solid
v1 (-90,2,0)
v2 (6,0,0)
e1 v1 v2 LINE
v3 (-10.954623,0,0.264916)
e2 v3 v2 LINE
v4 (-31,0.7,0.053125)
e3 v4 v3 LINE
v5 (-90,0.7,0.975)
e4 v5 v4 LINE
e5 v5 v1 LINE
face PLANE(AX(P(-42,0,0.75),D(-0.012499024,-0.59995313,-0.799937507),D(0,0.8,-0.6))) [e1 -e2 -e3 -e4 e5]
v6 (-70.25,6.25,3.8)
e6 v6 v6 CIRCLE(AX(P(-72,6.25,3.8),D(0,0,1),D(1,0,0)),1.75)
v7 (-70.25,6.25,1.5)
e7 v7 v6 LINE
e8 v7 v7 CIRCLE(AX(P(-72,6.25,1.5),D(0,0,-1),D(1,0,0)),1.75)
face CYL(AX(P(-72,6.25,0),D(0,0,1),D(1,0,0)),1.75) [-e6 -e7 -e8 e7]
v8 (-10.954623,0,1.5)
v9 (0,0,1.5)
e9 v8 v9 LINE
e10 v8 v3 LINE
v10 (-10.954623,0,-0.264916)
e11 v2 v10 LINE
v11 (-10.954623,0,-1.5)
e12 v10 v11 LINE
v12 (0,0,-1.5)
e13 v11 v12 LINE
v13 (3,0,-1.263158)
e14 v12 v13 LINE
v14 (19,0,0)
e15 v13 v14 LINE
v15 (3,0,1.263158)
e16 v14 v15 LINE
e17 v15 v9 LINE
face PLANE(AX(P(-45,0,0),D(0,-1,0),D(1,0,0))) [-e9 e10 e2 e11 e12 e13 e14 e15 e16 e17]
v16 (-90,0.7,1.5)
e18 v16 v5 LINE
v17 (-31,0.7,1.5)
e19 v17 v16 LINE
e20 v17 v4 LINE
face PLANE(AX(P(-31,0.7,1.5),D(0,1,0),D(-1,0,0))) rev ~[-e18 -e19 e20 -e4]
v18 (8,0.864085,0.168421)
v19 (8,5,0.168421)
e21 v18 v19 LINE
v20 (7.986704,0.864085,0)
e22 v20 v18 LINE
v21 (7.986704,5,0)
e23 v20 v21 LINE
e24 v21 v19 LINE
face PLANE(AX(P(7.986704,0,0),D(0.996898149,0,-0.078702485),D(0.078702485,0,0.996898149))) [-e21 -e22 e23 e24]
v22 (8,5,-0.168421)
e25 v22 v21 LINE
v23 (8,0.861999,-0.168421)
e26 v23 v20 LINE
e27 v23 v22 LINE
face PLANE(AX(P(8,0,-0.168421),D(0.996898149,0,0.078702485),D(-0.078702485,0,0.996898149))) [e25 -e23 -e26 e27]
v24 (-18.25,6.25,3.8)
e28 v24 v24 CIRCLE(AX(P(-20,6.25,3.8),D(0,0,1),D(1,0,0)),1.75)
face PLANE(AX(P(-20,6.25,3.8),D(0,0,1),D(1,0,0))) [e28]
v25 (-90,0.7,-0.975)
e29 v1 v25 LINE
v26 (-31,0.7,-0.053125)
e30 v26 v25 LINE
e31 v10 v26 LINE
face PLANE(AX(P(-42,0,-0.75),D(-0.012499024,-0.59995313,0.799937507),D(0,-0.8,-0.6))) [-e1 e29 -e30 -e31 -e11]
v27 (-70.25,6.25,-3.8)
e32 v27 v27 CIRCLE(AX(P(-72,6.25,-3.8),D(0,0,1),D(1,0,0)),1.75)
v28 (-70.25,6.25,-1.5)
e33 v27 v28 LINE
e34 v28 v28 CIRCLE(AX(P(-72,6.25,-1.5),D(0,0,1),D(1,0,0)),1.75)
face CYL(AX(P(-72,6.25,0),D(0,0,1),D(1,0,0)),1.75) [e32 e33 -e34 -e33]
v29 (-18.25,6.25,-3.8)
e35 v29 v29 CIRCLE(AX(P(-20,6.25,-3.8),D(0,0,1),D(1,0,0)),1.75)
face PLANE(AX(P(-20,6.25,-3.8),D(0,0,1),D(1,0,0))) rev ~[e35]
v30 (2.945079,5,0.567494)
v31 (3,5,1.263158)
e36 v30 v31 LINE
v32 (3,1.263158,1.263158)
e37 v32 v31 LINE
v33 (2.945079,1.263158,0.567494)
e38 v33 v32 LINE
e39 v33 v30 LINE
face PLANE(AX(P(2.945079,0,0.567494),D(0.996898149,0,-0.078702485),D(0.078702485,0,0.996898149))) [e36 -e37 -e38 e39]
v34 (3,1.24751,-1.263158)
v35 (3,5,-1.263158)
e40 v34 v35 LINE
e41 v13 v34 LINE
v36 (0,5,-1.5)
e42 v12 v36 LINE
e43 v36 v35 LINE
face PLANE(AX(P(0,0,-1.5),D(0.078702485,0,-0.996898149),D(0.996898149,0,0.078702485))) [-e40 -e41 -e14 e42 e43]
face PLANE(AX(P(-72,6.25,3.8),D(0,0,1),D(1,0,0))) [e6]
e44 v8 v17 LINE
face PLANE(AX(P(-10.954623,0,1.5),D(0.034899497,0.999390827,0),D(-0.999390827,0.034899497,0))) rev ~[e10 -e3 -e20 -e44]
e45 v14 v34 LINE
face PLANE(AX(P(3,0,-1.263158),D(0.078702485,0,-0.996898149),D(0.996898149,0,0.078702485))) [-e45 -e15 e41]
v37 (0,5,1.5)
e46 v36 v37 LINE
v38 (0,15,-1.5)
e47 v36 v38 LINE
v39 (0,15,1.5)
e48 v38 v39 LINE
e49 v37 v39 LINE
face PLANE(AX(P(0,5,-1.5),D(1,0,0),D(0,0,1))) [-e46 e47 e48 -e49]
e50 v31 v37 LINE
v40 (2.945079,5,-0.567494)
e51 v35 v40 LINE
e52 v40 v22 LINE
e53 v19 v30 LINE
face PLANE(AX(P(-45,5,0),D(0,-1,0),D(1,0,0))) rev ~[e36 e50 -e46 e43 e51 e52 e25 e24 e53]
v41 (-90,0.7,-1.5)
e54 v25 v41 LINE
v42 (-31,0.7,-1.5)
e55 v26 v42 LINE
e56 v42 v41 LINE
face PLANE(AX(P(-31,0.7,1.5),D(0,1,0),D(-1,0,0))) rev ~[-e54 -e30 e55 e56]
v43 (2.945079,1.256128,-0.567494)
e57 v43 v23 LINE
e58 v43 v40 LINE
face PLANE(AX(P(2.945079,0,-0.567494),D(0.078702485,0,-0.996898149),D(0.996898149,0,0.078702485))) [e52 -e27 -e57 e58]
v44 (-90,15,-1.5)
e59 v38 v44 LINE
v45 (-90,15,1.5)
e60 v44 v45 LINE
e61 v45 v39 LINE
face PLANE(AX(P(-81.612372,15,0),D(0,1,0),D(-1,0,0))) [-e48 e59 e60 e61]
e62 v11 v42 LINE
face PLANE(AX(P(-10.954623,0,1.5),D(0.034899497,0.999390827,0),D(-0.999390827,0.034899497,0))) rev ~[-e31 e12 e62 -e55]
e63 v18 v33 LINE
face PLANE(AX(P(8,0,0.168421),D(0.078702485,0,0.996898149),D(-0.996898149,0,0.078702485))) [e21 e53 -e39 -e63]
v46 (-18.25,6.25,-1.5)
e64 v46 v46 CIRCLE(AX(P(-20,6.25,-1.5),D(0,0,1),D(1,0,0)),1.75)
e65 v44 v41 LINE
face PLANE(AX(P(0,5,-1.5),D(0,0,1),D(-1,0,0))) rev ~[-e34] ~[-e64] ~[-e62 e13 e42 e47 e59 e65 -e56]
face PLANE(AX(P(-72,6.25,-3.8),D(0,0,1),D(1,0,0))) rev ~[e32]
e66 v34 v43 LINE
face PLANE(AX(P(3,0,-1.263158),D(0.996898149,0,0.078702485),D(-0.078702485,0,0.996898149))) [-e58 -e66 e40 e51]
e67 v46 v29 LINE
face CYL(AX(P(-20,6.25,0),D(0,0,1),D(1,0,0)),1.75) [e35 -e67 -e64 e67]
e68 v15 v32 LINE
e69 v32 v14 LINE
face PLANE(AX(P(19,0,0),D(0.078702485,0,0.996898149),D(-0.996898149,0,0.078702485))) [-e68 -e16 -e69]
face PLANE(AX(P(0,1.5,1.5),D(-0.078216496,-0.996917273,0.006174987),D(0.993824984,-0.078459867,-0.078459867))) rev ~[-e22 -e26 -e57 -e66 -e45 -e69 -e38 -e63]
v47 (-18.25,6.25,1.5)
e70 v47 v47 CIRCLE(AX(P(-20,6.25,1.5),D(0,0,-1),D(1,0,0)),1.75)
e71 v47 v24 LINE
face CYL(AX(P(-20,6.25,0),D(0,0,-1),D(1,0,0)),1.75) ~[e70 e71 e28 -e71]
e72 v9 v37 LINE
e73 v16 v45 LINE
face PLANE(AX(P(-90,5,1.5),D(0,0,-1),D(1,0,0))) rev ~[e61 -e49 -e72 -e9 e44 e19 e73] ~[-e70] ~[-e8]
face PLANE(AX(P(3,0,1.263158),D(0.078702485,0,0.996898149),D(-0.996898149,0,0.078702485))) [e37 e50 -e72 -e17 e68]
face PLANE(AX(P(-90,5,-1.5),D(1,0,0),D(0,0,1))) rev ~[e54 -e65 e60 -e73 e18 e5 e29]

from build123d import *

# Parameters (mm, degrees)
F1_DEPTH  = 1.5
F3_DEPTH  = 25
F4_DEPTH  = 5
F6_W      = 90
F6_H      = 3
F7_DEPTH  = 5
F5_R      = 1.75
F8_DEPTH  = 3.8
F9_W      = 16.7752551286
F9_H      = 3
F9_W_2    = 2.4494897428
F9_W_3    = 49.5505102572
F9_W_4    = 18.7752551286
F10_DEPTH = 10
F15_DEPTH = 5.301


# Not quite as in the source:
# - ends of sketch curves that miss each other by under 0.0002 mm in the source are joined


with BuildPart() as f1:
    # F0 (on Front) → F1 (new body)
    with BuildSketch(Plane.XZ):
        Polygon((0, -0.8), (0, -1.5), (3, -1.2631578947), (2.9450791466, -0.5674937516), align=None)
        Polygon((2.9450791466, -0.5674937516), (3, -1.2631578947), (19, 0), (10.1333333333, 0), (8, -0.1684210526), align=None)
        Polygon((0, 0), (0, -0.8), (2.9450791466, -0.5674937516), (8, -0.1684210526), (7.9867036011, 0), align=None)
        Polygon((10.1333333333, 0), (19, 0), (3, 1.2631578947), (2.9450791466, 0.5674937516), (8, 0.1684210526), align=None)
        Polygon((0, 0.8), (0, 0), (7.9867036011, 0), (8, 0.1684210526), (2.9450791466, 0.5674937516), align=None)
        Polygon((2.9450791466, 0.5674937516), (3, 1.2631578947), (0, 1.5), (0, 0.8), align=None)
        Polygon((8, -0.1684210526), (10.1333333333, 0), (7.9867036011, 0), align=None)
        Polygon((7.9867036011, 0), (10.1333333333, 0), (8, 0.1684210526), align=None)
    extrude(amount=-F1_DEPTH)

    # F2 (on face) → F3 (cut)
    with BuildSketch(Plane(origin=(0.117687543, 0, 1.4907088782), x_dir=(0.9968981487, 0, -0.0787024854), z_dir=(0.0787024854, 0, 0.9968981487))):
        Polygon((18.9410648244, 1.5), (-0.1180537281, 1.5), (18.9410648244, 0), align=None)
    extrude(amount=-F3_DEPTH, mode=Mode.SUBTRACT)

    # F0 (on Front) → F4 (join)
    with BuildSketch(Plane.XZ):
        Polygon((0, 0.8), (0, 0), (7.9867036011, 0), (8, 0.1684210526), (2.9450791466, 0.5674937516), align=None)
        Polygon((0, 0), (0, -0.8), (2.9450791466, -0.5674937516), (8, -0.1684210526), (7.9867036011, 0), align=None)
        Polygon((0, -0.8), (0, -1.5), (3, -1.2631578947), (2.9450791466, -0.5674937516), align=None)
        Polygon((2.9450791466, 0.5674937516), (3, 1.2631578947), (0, 1.5), (0, 0.8), align=None)
    extrude(amount=-F4_DEPTH)

    # F6 (on face) → F7 (join, through all)
    with BuildSketch(Plane.XZ):
        with Locations((-45, 0)):
            Rectangle(F6_W, F6_H)
    extrude(amount=-F7_DEPTH)

    # F5 (on Top) → F8 (join, symmetric)
    with BuildSketch(Plane.XY):
        with Locations((-20, 6.25)):
            Circle(F5_R)
        with Locations((-72, 6.25)):
            Circle(F5_R)
    extrude(amount=F8_DEPTH, both=True)

    # F9 (on face) → F10 (join)
    with BuildSketch(Plane(origin=(0, 5, 0), x_dir=(-1, 0, 0), z_dir=(0, 1, 0))):
        with Locations((81.6123724357, 0)):
            Rectangle(F9_W, F9_H)
        with Locations((72, 0)):
            Rectangle(F9_W_2, F9_H)
        with Locations((46, 0)):
            Rectangle(F9_W_3, F9_H)
        with Locations((20, 0)):
            Rectangle(F9_W_2, F9_H)
        with Locations((9.3876275643, 0)):
            Rectangle(F9_W_4, F9_H)
    extrude(amount=F10_DEPTH)

    # F13: sweep along a path in F11
    with BuildLine(Plane.XY) as f13_path:
        Line((-90, 2), (6, 0))
    # F12 (on face) → F13 (sweep, cut)
    with BuildSketch(Plane(origin=(-90, 0, 0), x_dir=(0, -1, 0), z_dir=(-1, 0, 0))):
        Polygon((-2, 0), (0, -1.5), (0, 1.5), align=None)
    sweep(path=f13_path.line, mode=Mode.SUBTRACT)

    # F14 (on face) → F15 (cut, through all)
    with BuildSketch(Plane.XY.offset(1.5)):
        Polygon((-90, 0.7), (-90, 0), (-10.954622702, 0), (-31, 0.7), align=None)
    extrude(amount=-F15_DEPTH, mode=Mode.SUBTRACT)


solid = f1.part
